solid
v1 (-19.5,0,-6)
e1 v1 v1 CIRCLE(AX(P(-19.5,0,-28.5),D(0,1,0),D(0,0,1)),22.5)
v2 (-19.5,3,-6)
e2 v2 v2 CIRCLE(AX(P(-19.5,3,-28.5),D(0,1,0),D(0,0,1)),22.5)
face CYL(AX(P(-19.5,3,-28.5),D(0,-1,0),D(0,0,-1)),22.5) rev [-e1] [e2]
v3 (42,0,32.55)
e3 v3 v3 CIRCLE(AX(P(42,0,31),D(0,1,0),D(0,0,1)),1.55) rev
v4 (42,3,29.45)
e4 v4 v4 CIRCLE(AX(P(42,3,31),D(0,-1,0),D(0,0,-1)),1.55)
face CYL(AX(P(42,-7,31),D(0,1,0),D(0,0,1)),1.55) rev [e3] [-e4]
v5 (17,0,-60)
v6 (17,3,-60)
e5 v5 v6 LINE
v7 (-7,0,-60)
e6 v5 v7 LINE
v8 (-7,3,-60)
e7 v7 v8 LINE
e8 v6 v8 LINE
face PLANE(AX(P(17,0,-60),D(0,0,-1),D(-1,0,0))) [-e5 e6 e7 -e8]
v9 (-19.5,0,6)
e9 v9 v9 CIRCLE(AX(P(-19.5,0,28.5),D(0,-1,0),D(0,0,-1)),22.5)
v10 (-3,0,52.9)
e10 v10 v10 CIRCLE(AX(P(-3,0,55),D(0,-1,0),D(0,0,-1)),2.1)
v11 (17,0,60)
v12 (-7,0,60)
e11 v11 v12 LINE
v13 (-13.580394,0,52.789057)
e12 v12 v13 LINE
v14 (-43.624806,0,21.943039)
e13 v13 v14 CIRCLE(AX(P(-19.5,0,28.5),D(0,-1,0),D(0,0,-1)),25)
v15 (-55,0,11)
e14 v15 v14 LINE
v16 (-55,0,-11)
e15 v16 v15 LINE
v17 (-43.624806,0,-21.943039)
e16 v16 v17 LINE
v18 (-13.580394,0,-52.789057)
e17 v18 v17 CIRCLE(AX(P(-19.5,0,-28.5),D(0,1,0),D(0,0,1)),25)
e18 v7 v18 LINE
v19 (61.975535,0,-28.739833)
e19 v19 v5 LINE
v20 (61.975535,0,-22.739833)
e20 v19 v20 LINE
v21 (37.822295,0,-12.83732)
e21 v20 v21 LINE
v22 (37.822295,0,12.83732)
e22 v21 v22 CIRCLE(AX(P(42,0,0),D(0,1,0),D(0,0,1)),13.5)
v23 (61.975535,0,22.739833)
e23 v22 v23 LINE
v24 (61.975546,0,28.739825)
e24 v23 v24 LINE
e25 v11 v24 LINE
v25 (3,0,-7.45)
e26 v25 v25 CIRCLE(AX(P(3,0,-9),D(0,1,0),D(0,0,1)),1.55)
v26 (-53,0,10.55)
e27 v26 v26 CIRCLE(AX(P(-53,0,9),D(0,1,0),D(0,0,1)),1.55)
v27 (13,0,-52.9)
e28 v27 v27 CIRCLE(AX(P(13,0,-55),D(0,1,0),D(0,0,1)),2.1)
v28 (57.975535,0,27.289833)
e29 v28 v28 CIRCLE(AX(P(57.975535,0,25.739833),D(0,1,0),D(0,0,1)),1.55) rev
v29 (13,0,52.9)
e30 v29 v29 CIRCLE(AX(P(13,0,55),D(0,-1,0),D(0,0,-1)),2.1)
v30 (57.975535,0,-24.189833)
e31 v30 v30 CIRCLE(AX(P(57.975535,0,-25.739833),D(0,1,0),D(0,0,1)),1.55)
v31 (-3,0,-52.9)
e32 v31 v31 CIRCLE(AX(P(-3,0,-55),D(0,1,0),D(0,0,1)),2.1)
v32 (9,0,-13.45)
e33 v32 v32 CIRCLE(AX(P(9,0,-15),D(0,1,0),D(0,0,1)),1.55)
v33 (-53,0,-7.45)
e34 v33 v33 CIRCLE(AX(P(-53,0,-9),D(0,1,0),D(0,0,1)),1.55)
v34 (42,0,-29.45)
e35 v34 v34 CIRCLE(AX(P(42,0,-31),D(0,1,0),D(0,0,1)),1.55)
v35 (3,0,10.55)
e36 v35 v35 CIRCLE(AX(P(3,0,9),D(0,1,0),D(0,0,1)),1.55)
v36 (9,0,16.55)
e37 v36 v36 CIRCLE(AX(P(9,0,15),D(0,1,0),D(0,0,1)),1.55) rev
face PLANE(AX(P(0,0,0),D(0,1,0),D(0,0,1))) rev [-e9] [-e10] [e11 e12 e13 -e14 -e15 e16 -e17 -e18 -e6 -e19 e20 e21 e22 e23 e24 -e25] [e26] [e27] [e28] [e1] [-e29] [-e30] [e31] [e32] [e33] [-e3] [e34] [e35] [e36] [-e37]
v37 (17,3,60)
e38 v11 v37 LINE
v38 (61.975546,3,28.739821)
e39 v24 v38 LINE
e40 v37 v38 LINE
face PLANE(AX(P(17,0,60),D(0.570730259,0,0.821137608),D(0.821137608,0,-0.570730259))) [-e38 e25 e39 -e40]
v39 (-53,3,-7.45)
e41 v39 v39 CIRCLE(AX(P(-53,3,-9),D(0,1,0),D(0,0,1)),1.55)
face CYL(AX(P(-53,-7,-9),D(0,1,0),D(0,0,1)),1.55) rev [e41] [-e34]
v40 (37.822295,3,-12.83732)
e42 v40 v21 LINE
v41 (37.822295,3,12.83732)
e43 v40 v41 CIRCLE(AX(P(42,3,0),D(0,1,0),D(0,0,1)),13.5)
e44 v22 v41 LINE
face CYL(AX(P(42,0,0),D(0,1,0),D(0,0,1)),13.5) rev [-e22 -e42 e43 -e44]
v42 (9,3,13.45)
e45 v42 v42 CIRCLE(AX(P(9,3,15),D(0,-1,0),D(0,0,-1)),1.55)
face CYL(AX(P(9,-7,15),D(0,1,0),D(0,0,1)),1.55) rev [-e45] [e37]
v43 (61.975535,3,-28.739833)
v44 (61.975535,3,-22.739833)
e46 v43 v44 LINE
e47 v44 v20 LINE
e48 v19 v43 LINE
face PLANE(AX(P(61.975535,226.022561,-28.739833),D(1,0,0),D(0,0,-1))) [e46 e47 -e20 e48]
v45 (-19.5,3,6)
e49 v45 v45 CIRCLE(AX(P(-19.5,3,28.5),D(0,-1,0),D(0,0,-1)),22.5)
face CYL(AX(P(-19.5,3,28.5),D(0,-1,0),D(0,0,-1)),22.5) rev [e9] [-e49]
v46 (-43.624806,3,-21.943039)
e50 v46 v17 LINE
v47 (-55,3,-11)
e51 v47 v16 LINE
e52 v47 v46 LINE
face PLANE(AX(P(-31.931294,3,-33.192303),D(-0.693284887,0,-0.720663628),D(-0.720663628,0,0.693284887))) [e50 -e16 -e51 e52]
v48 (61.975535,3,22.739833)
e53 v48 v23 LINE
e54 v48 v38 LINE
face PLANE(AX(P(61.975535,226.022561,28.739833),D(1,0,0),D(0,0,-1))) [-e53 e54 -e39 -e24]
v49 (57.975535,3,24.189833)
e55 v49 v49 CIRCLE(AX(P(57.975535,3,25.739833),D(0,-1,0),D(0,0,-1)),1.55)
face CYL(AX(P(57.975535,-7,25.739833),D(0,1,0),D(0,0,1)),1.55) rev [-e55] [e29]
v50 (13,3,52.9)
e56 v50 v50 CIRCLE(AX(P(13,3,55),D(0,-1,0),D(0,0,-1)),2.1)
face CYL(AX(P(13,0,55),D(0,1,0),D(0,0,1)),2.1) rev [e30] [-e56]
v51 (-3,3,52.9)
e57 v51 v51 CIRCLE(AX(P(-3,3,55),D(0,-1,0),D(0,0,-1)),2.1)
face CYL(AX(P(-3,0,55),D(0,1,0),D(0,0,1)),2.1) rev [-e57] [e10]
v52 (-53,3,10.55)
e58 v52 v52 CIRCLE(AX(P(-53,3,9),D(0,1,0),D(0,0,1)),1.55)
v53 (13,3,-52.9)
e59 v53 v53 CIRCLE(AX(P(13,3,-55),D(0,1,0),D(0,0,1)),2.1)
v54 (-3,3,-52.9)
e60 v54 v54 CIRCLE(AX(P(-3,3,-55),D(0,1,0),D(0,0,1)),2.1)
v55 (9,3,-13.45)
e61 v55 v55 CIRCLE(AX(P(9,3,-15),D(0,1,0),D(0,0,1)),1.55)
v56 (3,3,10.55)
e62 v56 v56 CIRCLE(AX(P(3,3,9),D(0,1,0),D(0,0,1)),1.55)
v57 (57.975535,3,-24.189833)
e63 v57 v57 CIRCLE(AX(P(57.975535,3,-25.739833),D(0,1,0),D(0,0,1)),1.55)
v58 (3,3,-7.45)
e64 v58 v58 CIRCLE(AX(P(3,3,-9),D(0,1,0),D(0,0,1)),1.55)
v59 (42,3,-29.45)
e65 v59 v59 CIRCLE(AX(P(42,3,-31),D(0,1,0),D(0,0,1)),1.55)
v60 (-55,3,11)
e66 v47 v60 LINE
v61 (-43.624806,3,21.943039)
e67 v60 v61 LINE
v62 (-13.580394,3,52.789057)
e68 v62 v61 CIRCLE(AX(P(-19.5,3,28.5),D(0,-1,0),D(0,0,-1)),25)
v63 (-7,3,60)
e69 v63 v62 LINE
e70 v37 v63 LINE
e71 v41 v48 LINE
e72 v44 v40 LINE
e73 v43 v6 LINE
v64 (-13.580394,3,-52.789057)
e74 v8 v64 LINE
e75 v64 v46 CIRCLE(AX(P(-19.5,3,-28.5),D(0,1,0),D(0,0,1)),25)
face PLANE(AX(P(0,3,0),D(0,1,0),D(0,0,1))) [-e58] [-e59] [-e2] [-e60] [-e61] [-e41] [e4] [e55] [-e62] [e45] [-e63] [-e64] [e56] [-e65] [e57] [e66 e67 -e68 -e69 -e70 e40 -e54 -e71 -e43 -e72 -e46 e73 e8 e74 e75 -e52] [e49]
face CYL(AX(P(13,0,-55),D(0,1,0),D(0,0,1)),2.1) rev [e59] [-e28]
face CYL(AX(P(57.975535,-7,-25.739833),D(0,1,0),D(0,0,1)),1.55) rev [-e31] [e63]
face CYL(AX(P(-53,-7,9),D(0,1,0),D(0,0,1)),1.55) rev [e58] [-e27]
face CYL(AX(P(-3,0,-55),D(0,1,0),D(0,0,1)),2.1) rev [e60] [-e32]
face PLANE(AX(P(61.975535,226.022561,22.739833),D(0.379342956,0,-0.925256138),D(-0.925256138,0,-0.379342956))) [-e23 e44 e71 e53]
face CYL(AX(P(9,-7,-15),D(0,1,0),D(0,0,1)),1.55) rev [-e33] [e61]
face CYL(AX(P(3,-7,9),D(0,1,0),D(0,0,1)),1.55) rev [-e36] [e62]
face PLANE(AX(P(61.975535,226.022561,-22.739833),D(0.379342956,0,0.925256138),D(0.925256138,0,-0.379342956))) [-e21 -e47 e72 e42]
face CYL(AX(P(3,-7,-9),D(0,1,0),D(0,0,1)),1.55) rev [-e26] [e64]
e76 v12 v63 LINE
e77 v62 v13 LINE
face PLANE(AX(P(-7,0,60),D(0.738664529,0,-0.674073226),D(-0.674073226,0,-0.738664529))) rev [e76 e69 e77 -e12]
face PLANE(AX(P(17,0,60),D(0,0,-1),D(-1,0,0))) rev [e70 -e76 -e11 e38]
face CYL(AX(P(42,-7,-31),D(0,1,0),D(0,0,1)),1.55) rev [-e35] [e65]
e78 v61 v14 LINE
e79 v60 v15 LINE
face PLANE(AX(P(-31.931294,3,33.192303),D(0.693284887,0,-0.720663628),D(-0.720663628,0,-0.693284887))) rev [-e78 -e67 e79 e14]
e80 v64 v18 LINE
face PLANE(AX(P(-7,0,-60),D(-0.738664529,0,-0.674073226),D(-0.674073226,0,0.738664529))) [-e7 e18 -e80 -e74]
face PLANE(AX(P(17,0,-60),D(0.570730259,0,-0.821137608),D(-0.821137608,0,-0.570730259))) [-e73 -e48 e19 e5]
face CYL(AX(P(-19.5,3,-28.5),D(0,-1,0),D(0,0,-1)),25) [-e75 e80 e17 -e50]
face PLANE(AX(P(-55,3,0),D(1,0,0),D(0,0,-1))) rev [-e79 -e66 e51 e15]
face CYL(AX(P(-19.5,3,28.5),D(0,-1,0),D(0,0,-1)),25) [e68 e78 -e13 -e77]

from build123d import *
from build123d.topology import SkipClean

# Parameters (mm, degrees)
SKETCH_1_R               = 1.55
SKETCH_1_R_2             = 4
EXTRUDE_1_DEPTH          = 3
EXTRUDE_START            = -3
SKETCH_2_R               = 2.1
EXTRUDE_3_DEPTH          = 3
FILLET_1_R               = 4
FILLET_2_R               = 314
FILLET_3_R               = 314
FILLET_4_R               = 4
CUT_EXTRUDE_2_DEPTH      = 3
EXTRUDE_4_DEPTH          = 3
CUT_EXTRUDE_START        = -10
SKETCH_5_R               = 22.5
CUT_EXTRUDE_3_DEPTH      = 10
SKETCH_6_R               = 13.5
EXTRUDE_5_DEPTH          = 3
EXTRUDE_6_DEPTH          = 3
CUT_EXTRUDE_5_DEPTH      = 98.662684788
CUT_EXTRUDE_5_DEPTH_BACK = 3
SKETCH_9_R               = 1.55
CUT_EXTRUDE_7_DEPTH      = 10
SKETCH_10_W              = 64.519287894
SKETCH_10_H              = 7.041569679
EXTRUDE_7_DEPTH          = 3
SKETCH_11_R              = 1.55
CUT_EXTRUDE_8_DEPTH      = 10


with BuildPart() as part:
    # 草图1 → 凸台-拉伸1 (new body)
    with BuildSketch(Plane(origin=(0, 0, 0), x_dir=(1, 0, 0), z_dir=(0, 1, 0))):
        with BuildLine():
            Line((-27.819418646, 37.14796354), (-55, 11))
            Line((-55, 11), (-55, -11))
            Line((-55, -11), (-27.819418646, -37.14796354))
            ThreePointArc((-27.819418646, -37.14796354), (-23.984664844, -39.630488814), (-19.5, -40.5))
            Line((-19.5, -40.5), (-17.421399483, -40.31860482))
            Line((-17.421399483, -40.31860482), (45.042813224, -34.867481809))
            ThreePointArc((45.042813224, -34.867481809), (58.724014778, -30.74585061), (69.617928959, -21.5))
            Line((69.617928959, -21.5), (19, -21.5))
            ThreePointArc((19, -21.5), (15.464466094, -20.035533906), (14, -16.5))
            Line((14, -16.5), (14, -12.539936204))
            ThreePointArc((14, -12.539936204), (5.5, 0), (14, 12.539936204))
            Line((14, 12.539936204), (14, 16.5))
            ThreePointArc((14, 16.5), (15.464466094, 20.035533906), (19, 21.5))
            Line((19, 21.5), (69.617928959, 21.5))
            ThreePointArc((69.617928959, 21.5), (58.724014778, 30.74585061), (45.042813224, 34.867481809))
            Line((45.042813224, 34.867481809), (-17.421399483, 40.31860482))
            Line((-17.421399483, 40.31860482), (-19.5, 40.5))
            ThreePointArc((-19.5, 40.5), (-23.984664844, 39.630488814), (-27.819418646, 37.14796354))
        make_face()
        with Locations(Location((-29, -28.5, 0), (0, 0, 270))):
            Circle(SKETCH_1_R, mode=Mode.SUBTRACT)
        with Locations(Location((-19.5, -36.5, 0), (0, 0, 270))):
            Circle(SKETCH_1_R, mode=Mode.SUBTRACT)
        with Locations(Location((-19.5, -28.5, 0), (0, 0, 270))):
            Circle(SKETCH_1_R_2, mode=Mode.SUBTRACT)
        with Locations(Location((-10, -28.5, 0), (0, 0, 270))):
            Circle(SKETCH_1_R, mode=Mode.SUBTRACT)
        with Locations(Location((-19.5, -20.5, 0), (0, 0, 270))):
            Circle(SKETCH_1_R, mode=Mode.SUBTRACT)
        with Locations(Location((-46.5, 0, 0), (0, 0, 270))):
            Circle(SKETCH_1_R, mode=Mode.SUBTRACT)
        with Locations(Location((-27.5, 0, 0), (0, 0, 270))):
            Circle(SKETCH_1_R, mode=Mode.SUBTRACT)
        with Locations(Location((0, 0, 0), (0, 0, 270))):
            Circle(SKETCH_1_R, mode=Mode.SUBTRACT)
        with Locations(Location((-29, 28.5, 0), (0, 0, 270))):
            Circle(SKETCH_1_R, mode=Mode.SUBTRACT)
        with Locations(Location((-19.5, 20.5, 0), (0, 0, 270))):
            Circle(SKETCH_1_R, mode=Mode.SUBTRACT)
        with Locations(Location((-19.5, 28.5, 0), (0, 0, 270))):
            Circle(SKETCH_1_R_2, mode=Mode.SUBTRACT)
        with Locations(Location((-10, 28.5, 0), (0, 0, 270))):
            Circle(SKETCH_1_R, mode=Mode.SUBTRACT)
        with Locations(Location((-19.5, 36.5, 0), (0, 0, 270))):
            Circle(SKETCH_1_R, mode=Mode.SUBTRACT)
    extrude(amount=EXTRUDE_1_DEPTH)

    # 草图2 → 凸台-拉伸3 (add)
    with BuildSketch(Plane(origin=(0, 3, 0), x_dir=(1, 0, 0), z_dir=(0, 1, 0)).offset(EXTRUDE_START)):
        with BuildLine():
            Line((-7, 60), (-28.363974347, 36.588878709))
            ThreePointArc((-28.363974347, 36.588878709), (-26.665503977, 38.125775437), (-24.705947863, 39.311942788))
            Line((-24.705947863, 39.311942788), (-19.656872495, 39.177623495))
            Line((-19.656872495, 39.177623495), (-17.421399483, 40.31860482))
            Line((-17.421399483, 40.31860482), (17, 37.314720281))
            Line((17, 37.314720281), (17, 50))
            Line((17, 50), (17, 60))
            Line((17, 60), (-7, 60))
        make_face()
        with Locations(Location((13, 55, 0), (0, 0, 270))):
            Circle(SKETCH_2_R, mode=Mode.SUBTRACT)
        with Locations(Location((-3, 55, 0), (0, 0, 270))):
            Circle(SKETCH_2_R, mode=Mode.SUBTRACT)
    extrude_3 = extrude(amount=EXTRUDE_3_DEPTH)

    # 圆角1
    fillet_1_edges = [part.edges().sort_by_distance(p)[0] for p in [
        (17, 1.5, -37.314720281),
    ]]
    fillet(fillet_1_edges, radius=FILLET_1_R)

    # 圆角2
    # the kernel refuses this fillet: 314 mm, written as the material it adds along each edge
    with BuildSketch(Plane(origin=(-28.100791786, 0, -36.877280051), x_dir=(0.6740732257670936, 0, -0.7386645289330906), z_dir=(0, 1, 0))) as fillet_2_piece_1:
        with BuildLine():
            CenterArc((FILLET_2_R * 0.032536346624, FILLET_2_R), FILLET_2_R, 266.272924122, 3.727075878)
            Line((-FILLET_2_R * 0.0324675326171, FILLET_2_R * 0.0021149887469), (0, 0))
            Line((0, 0), (FILLET_2_R * 0.032536346624, 0))
        make_face()
    extrude(amount=3)

    # 镜向2: 凸台-拉伸3 across plane
    add(extrude_3.mirror(Plane.XY))

    # 圆角3
    # the kernel refuses this fillet: 314 mm, written as the material it adds along each edge
    with BuildSketch(Plane(origin=(-28.100791786, 0, 36.877280051), x_dir=(-0.7206636283184775, 0, -0.6932848871992288), z_dir=(0, 1, 0))) as fillet_3_piece_1:
        with BuildLine():
            CenterArc((FILLET_3_R * 0.0325363466241, FILLET_3_R), FILLET_3_R, 266.272924122, 3.727075878)
            Line((-FILLET_3_R * 0.0324675326171, FILLET_3_R * 0.0021149887469), (0, 0))
            Line((0, 0), (FILLET_3_R * 0.032536346624, 0))
        make_face()
    extrude(amount=3)

    # 圆角4
    fillet_4_edges = [part.edges().sort_by_distance(p)[0] for p in [
        (17, 1.5, 37.314720281),
    ]]
    fillet(fillet_4_edges, radius=FILLET_4_R)

    # 草图3 → 切除-拉伸2 (cut)
    with BuildSketch(Plane.XZ):
        with BuildLine():
            ThreePointArc((-8.686732059, 48.231275591), (-35.637539634, 44.178960889), (-38.911435654, 17.122558906))
            ThreePointArc((-38.911435654, 17.122558906), (-32.411561674, 15.426493388), (-30.715496156, 21.926367368))
            ThreePointArc((-30.715496156, 21.926367368), (-28.823911789, 37.55895518), (-13.252334078, 39.900292563))
            ThreePointArc((-13.252334078, 39.900292563), (-6.804041555, 41.782983067), (-8.686732059, 48.231275591))
        make_face()
    cut_extrude_2 = extrude(amount=-CUT_EXTRUDE_2_DEPTH, mode=Mode.SUBTRACT)

    # 草图4 → 凸台-拉伸4 (add)
    with SkipClean():  # the faces are left unmerged after this step: merging them gives an invalid solid
        with BuildSketch(Plane.XZ):
            with BuildLine():
                Line((-43.624805935, 21.943038922), (-41.535713139, 23.952764967))
                ThreePointArc((-41.535713139, 23.952764967), (-35.617955509, 44.199092655), (-15.534428758, 50.647781937))
                Line((-15.534428758, 50.647781937), (-13.580394358, 52.78905657))
                ThreePointArc((-13.580394358, 52.78905657), (-37.408839455, 45.943436284), (-43.624805935, 21.943038922))
            make_face()
            with BuildLine():
                ThreePointArc((-25.118289886, 40.223259732), (-28.812596517, 37.570586867), (-31.367097826, 33.807729194))
                ThreePointArc((-31.367097826, 33.807729194), (-28.219819959, 36.993214998), (-25.118289886, 40.223259732))
            make_face()
        extrude_4 = extrude(amount=-EXTRUDE_4_DEPTH)

    # 镜向9: 切除-拉伸2, 凸台-拉伸4 across plane
    with SkipClean():  # the faces are left unmerged after this step: merging them gives an invalid solid
        add(cut_extrude_2.mirror(Plane.XY), mode=Mode.SUBTRACT)
        add(extrude_4.mirror(Plane.XY))

    # 草图5 → 切除-拉伸3 (cut)
    with SkipClean():  # the faces are left unmerged after this step: merging them gives an invalid solid
        with BuildSketch(Plane(origin=(0, 3, 0), x_dir=(1, 0, 0), z_dir=(0, 1, 0)).offset(CUT_EXTRUDE_START)):
            with Locations(Location((-19.5, 28.5, 0), (0, 0, 270))):
                Circle(SKETCH_5_R)
            with Locations(Location((-19.5, -28.5, 0), (0, 0, 90))):
                Circle(SKETCH_5_R)
        extrude(amount=CUT_EXTRUDE_3_DEPTH, mode=Mode.SUBTRACT)

    # 草图6 → 凸台-拉伸5 (add)
    with SkipClean():  # the faces are left unmerged after this step: merging them gives an invalid solid
        with BuildSketch(Plane(origin=(0, 3, 0), x_dir=(1, 0, 0), z_dir=(0, 1, 0)).offset(EXTRUDE_START)):
            with BuildLine():
                ThreePointArc((7.831521739, -7.583870604), (77, 0), (7.831521739, 7.583870604))
                ThreePointArc((7.831521739, 7.583870604), (5.5, 0), (7.831521739, -7.583870604))
            make_face()
            with Locations(Location((42, 0, 0), (0, 0, 270))):
                Circle(SKETCH_6_R, mode=Mode.SUBTRACT)
        extrude(amount=EXTRUDE_5_DEPTH)

    # 草图7 → 凸台-拉伸6 (add)
    with SkipClean():  # the faces are left unmerged after this step: merging them gives an invalid solid
        with BuildSketch(Plane(origin=(0, 3, 0), x_dir=(1, 0, 0), z_dir=(0, 1, 0)).offset(EXTRUDE_START)):
            with BuildLine():
                Line((17, 60), (61.975534644, 28.739833258))
                ThreePointArc((61.975534644, 28.739833258), (53.910000161, 32.911273086), (45.042813224, 34.867481809))
                Line((45.042813224, 34.867481809), (20.652249917, 36.995995963))
                ThreePointArc((20.652249917, 36.995995963), (18.051186651, 38.278167206), (17, 40.980851027))
                Line((17, 40.980851027), (17, 60))
            make_face()
            with BuildLine():
                Line((17, -60), (61.975557807, -28.739817159))
                ThreePointArc((61.975557807, -28.739817159), (53.910013423, -32.911268287), (45.042813224, -34.867481809))
                Line((45.042813224, -34.867481809), (20.652249917, -36.995995963))
                ThreePointArc((20.652249917, -36.995995963), (18.051186651, -38.278167206), (17, -40.980851027))
                Line((17, -40.980851027), (17, -60))
            make_face()
        extrude(amount=EXTRUDE_6_DEPTH)

    # 草图8 → 切除-拉伸5 (cut, two sides: drawn at the far end of the back side and taken through both)
    with SkipClean():  # the faces are left unmerged after this step: merging them gives an invalid solid
        with BuildSketch(Plane(origin=(0, 3, 0), x_dir=(1, 0, 0), z_dir=(0, 1, 0)).offset(-CUT_EXTRUDE_5_DEPTH_BACK)):
            with BuildLine():
                Line((61.975534644, 28.739833258), (61.975534644, 22.739833258))
                Line((61.975534644, 22.739833258), (35.963826017, 12.075371781))
                Line((35.963826017, 12.075371781), (35.963826017, -12.075371781))
                Line((35.963826017, -12.075371781), (61.975534644, -22.739833258))
                Line((61.975534644, -22.739833258), (61.975534644, -28.739833258))
                ThreePointArc((61.975534644, -28.739833258), (77, 1.4104e-05), (61.975534644, 28.739833258))
            make_face()
        extrude(amount=CUT_EXTRUDE_5_DEPTH + CUT_EXTRUDE_5_DEPTH_BACK, mode=Mode.SUBTRACT)

    # 草图9 → 切除-拉伸7 (cut)
    with SkipClean():  # the faces are left unmerged after this step: merging them gives an invalid solid
        with BuildSketch(Plane(origin=(0, 3, 0), x_dir=(1, 0, 0), z_dir=(0, 1, 0))):
            with Locations(Location((-53, -9, 0), (0, 0, 270))):
                Circle(SKETCH_9_R)
            with Locations(Location((-53, 9, 0), (0, 0, 270))):
                Circle(SKETCH_9_R)
            with Locations(Location((3, 9, 0), (0, 0, 270))):
                Circle(SKETCH_9_R)
            with Locations(Location((3, -9, 0), (0, 0, 270))):
                Circle(SKETCH_9_R)
        extrude(amount=-CUT_EXTRUDE_7_DEPTH, mode=Mode.SUBTRACT)

    # 草图10 → 凸台-拉伸7 (add)
    with SkipClean():  # the faces are left unmerged after this step: merging them gives an invalid solid
        with BuildSketch(Plane(origin=(0, 3, 0), x_dir=(1, 0, 0), z_dir=(0, 1, 0))):
            with Locations((-17.723905758, 0.445902683)):
                Rectangle(SKETCH_10_W, SKETCH_10_H)
        extrude(amount=-EXTRUDE_7_DEPTH)

    # 草图11 → 切除-拉伸8 (cut)
    with SkipClean():  # the faces are left unmerged after this step: merging them gives an invalid solid
        with BuildSketch(Plane(origin=(0, 3, 0), x_dir=(1, 0, 0), z_dir=(0, 1, 0))):
            with Locations(Location((57.975534644, 25.739833258, 0), (0, 0, 270))):
                Circle(SKETCH_11_R)
            with Locations(Location((42, 31, 0), (0, 0, 270))):
                Circle(SKETCH_11_R)
            with Locations(Location((9, 15, 0), (0, 0, 270))):
                Circle(SKETCH_11_R)
        cut_extrude_8 = extrude(amount=-CUT_EXTRUDE_8_DEPTH, mode=Mode.SUBTRACT)

    # 镜向10: 切除-拉伸8 across plane
    with SkipClean():  # the faces are left unmerged after this step: merging them gives an invalid solid
        add(cut_extrude_8.mirror(Plane.XY), mode=Mode.SUBTRACT)


solid = part.part
